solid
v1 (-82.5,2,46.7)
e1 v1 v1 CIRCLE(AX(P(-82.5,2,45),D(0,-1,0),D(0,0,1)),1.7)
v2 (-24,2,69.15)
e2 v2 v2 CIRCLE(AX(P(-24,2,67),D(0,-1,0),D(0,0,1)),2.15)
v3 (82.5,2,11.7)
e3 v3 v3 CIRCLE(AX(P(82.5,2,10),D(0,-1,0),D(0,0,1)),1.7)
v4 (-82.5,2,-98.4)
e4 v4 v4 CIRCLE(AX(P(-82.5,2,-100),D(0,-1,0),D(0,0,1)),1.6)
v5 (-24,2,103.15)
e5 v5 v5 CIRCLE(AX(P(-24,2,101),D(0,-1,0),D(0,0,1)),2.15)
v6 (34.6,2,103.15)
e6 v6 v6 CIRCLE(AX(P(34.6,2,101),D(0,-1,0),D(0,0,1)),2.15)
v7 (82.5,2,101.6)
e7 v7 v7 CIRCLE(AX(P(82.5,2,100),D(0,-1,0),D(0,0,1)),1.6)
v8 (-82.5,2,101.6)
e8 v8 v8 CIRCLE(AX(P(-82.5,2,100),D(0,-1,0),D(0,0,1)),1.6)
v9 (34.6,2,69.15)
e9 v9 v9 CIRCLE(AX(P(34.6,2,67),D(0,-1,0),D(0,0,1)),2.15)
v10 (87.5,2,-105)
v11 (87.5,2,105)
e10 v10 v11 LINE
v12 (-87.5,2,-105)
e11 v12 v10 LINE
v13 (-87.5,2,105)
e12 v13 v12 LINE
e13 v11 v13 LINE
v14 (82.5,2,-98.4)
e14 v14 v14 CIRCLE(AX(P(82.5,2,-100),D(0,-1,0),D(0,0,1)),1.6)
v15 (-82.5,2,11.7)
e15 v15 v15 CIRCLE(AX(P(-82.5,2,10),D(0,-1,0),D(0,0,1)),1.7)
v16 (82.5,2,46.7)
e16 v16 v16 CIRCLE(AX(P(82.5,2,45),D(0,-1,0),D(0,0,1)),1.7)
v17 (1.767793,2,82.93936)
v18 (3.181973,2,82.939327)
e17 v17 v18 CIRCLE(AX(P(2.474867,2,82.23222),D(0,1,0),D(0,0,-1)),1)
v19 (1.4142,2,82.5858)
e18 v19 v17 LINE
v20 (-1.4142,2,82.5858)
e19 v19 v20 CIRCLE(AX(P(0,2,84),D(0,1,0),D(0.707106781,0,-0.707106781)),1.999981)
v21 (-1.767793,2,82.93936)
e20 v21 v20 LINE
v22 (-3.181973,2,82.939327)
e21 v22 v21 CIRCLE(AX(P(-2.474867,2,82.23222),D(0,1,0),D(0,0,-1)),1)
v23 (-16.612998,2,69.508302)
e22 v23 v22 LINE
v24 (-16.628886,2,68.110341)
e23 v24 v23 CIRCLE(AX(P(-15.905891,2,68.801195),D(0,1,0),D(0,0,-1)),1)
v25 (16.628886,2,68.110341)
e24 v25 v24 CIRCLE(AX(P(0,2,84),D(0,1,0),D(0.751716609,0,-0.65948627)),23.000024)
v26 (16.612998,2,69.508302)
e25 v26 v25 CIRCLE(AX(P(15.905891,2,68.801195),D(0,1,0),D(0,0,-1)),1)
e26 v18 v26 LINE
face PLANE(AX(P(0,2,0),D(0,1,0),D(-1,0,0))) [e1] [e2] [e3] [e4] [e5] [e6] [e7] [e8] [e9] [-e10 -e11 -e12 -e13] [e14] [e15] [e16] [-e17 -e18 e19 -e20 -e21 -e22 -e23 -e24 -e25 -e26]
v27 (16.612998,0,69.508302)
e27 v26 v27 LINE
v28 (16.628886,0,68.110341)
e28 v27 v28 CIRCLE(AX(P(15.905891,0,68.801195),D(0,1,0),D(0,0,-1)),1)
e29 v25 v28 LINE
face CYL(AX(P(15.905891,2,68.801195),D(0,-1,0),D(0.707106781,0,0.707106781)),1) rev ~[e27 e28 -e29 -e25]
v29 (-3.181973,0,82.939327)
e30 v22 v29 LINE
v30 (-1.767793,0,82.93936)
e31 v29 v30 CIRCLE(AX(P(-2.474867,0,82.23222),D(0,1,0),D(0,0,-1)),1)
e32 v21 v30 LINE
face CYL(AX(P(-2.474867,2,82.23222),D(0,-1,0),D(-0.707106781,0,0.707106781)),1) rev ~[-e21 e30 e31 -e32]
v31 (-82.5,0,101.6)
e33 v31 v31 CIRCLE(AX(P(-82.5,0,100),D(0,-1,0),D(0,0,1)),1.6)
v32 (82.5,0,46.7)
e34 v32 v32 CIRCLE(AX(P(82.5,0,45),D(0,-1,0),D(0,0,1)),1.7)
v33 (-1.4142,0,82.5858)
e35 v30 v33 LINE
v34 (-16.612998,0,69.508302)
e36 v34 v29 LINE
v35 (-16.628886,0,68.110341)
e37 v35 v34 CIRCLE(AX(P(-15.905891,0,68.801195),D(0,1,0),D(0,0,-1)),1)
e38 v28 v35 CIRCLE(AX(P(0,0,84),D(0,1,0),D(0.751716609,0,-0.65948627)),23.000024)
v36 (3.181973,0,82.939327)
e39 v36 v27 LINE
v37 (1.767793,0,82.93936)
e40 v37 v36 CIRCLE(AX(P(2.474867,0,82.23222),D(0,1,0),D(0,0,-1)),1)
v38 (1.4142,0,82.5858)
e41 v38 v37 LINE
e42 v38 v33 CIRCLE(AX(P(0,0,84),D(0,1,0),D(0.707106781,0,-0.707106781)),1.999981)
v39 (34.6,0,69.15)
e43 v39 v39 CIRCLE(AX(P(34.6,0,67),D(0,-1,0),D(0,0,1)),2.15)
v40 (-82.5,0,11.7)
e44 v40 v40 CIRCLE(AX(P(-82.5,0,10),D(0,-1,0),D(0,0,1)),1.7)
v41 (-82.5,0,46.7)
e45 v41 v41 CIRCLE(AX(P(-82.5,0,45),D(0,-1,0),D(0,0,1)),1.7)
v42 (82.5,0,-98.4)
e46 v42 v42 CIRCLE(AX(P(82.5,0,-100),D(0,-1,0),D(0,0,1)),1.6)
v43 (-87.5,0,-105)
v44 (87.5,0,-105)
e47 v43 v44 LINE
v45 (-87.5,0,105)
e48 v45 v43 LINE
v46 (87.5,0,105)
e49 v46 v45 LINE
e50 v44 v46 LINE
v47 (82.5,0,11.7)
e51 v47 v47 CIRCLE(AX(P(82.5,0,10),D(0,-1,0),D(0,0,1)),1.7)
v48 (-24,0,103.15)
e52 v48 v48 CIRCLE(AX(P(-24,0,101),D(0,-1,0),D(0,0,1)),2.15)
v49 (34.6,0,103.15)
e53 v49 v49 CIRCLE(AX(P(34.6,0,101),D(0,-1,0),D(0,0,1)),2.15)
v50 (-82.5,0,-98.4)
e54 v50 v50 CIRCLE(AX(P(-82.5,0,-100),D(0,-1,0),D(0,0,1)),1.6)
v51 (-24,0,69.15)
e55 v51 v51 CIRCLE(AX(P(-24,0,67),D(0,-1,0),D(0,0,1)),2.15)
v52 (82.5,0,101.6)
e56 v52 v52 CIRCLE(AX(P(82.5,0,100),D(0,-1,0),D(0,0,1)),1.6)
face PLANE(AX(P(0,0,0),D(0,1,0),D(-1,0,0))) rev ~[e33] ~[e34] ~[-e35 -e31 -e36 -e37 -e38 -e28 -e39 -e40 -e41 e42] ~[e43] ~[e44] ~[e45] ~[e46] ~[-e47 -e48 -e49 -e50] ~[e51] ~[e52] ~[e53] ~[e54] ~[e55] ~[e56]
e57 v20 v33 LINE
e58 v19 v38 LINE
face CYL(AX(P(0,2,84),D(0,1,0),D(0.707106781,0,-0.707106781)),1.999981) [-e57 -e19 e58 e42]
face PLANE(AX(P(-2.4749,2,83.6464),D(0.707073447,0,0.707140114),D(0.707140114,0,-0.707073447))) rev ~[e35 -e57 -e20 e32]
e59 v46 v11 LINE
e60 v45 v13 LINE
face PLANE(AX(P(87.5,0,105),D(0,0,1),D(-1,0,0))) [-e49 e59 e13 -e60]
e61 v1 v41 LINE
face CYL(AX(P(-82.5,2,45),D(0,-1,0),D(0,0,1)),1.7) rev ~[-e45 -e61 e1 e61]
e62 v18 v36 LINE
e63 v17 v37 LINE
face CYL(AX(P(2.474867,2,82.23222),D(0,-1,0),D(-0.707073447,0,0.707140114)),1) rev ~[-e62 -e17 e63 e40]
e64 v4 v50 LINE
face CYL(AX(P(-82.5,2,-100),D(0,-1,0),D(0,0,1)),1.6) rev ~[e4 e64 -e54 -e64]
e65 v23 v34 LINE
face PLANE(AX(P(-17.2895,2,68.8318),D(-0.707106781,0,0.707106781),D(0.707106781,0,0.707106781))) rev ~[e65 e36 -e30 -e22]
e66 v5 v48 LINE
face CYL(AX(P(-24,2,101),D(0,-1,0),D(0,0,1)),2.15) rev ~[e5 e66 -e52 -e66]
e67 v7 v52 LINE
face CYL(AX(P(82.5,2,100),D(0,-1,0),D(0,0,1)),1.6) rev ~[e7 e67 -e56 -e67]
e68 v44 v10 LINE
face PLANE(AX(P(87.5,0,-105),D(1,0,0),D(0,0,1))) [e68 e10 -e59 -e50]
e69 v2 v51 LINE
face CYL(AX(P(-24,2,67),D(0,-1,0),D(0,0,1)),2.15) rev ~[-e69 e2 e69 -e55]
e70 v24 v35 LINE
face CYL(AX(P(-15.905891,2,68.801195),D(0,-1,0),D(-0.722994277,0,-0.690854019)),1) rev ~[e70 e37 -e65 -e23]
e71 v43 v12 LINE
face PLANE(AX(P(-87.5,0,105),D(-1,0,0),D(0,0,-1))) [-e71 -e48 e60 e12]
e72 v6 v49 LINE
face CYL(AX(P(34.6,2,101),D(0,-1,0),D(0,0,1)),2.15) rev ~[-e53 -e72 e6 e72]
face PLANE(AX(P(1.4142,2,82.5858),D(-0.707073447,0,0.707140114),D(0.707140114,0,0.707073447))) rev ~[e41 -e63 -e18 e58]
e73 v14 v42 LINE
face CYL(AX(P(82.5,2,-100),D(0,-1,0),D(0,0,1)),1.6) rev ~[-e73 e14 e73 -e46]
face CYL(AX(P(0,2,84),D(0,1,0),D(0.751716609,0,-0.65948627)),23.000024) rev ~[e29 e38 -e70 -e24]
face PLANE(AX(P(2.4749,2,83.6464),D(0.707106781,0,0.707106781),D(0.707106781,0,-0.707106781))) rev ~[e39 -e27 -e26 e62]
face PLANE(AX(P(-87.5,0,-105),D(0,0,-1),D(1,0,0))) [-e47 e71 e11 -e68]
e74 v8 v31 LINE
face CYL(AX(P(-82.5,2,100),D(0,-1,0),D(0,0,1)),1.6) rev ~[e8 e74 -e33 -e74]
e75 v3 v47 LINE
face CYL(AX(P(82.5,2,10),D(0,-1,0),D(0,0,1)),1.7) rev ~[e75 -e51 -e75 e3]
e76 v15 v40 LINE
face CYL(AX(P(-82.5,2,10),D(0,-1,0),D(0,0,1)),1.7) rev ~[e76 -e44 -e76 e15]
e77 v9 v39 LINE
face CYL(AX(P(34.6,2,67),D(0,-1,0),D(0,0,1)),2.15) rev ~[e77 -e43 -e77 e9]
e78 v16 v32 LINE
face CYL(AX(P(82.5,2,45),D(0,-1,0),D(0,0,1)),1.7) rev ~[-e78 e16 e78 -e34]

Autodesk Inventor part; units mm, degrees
ref_plane "YZ Plane" through (0, 0, 0) normal (1, 0, 0) x (0, 1, 0)
ref_plane "XZ Plane" through (0, 0, 0) normal (0, 1, 0) x (-1, 0, 0)
ref_plane "XY Plane" through (0, 0, 0) normal (0, 0, 1) x (1, 0, 0)
sketch "スケッチ1" plane through (0, 0, 0) normal (0, 1, 0) x (-1, 0, 0)
  line L0 (-87.5, 105) -> (87.5, 105)
  line L1 (87.5, 105) -> (87.5, -105)
  line L2 (87.5, -105) -> (-87.5, -105)
  line L3 (-87.5, -105) -> (-87.5, 105)
  line L4 (-87.5, 105) -> (87.5, -105) construction
  line L5 (87.5, 105) -> (-87.5, -105) construction
  point P0 (0, 0)
  dimension "d0" = 210
  dimension "d1" = 175
extrude "プレート1" add sketch "スケッチ1" along normal blind 2
sketch "スケッチ5" plane through (0, 2, 0) normal (0, 1, 0) x (1, 0, 0)
  line L0 (-24, -101) -> (34.6, -101)
  line L1 (34.6, -101) -> (34.6, -67)
  line L2 (34.6, -67) -> (-24, -67)
  line L3 (-24, -67) -> (-24, -101)
  line L4 (-24, -101) -> (34.6, -67) construction
  line L5 (34.6, -101) -> (-24, -67) construction
  line L6 (87.5, -105) -> (-87.5, -105) projected
  point P0 (0, 0)
  point P1 (0, -84)
  point P2 (5.3, -84)
  point P3 (5.3, -84)
  dimension "d31" = 58.6
  dimension "d32" = 24
  dimension "d33" = 34
  dimension "d78" = 4
hole "穴3" at (34.6, 2, 67) at (34.6, 2, 101) at (-24, 2, 67) at (-24, 2, 101) direction (0, -1, 0) diameter 4.3 end through all clearance for "Socket Head Cap Screw" size "M4" standard "Ansi Metric M Profile"
sketch "スケッチ6" plane through (0, 2, 0) normal (0, 1, 0) x (1, 0, 0)
  line L0 (-133.9967, -217.2896) -> (133.2896, 49.9967)
  line L1 (133.2896, 49.9967) -> (133.9967, 49.2896)
  line L2 (133.9967, 49.2896) -> (-133.2896, -217.9967)
  line L3 (-133.2896, -217.9967) -> (-133.9967, -217.2896)
  line L4 (-133.9967, -217.2896) -> (133.9967, 49.2896) construction
  line L5 (133.2896, 49.9967) -> (-133.2896, -217.9967) construction
  line L6 (133.9967, -217.2896) -> (-133.2896, 49.9967)
  line L7 (-133.2896, 49.9967) -> (-133.9967, 49.2896)
  line L8 (-133.9967, 49.2896) -> (133.2896, -217.9967)
  line L9 (133.2896, -217.9967) -> (133.9967, -217.2896)
  line L10 (133.9967, -217.2896) -> (-133.9967, 49.2896) construction
  line L11 (-133.2896, 49.9967) -> (133.2896, -217.9967) construction
  line L12 (-2.4749, -82.2322) -> (-1.7678, -81.5251)
  circle A0 centre (0, -84) radius 22
  line L13 (2.4749, -82.2322) -> (1.7678, -81.5251)
  circle A1 centre (0, -84) radius 3
  line L14 (-87.5, -105) -> (-87.5, 105) projected
  line L15 (87.5, 105) -> (87.5, -105) projected
  line L16 (122.5, 0) -> (-122.5, 0) projected
  point P0 (0, 0)
  point P1 (0, -84)
  point P2 (-2.1213, -81.8787)
  point P3 (2.1213, -81.8787)
  point P4 (15.9059, -68.8012)
  point P5 (-15.9059, -68.8012)
  dimension "d54" = 1
  dimension "d55" = 1
  dimension "d57" = 44
  dimension "d59" = 3
  dimension "d60" = 3
  dimension "d65" = 186
  dimension "d66" = 186
  dimension "d79" = 45
  dimension "d80" = 45
extrude "押し出し2" cut sketch "スケッチ6" against normal blind 10 contours A0 L6 L12 L8 | A0 L0 A1 L6 | L12 L6 A1 | A0 L2 L13 L0 | L0 L13 A1
sketch "スケッチ7" plane through (0, 2, 0) normal (0, 1, 0) x (1, 0, 0)
  line L0 (-82.5, -100) -> (82.5, -100)
  line L1 (82.5, -100) -> (82.5, 100)
  line L2 (82.5, 100) -> (-82.5, 100)
  line L3 (-82.5, 100) -> (-82.5, -100)
  line L4 (-82.5, -100) -> (82.5, 100) construction
  line L5 (82.5, -100) -> (-82.5, 100) construction
  line L6 (-87.5, -105) -> (-87.5, 105) projected
  line L7 (87.5, -105) -> (-87.5, -105) projected
  point P0 (0, 0)
  point P1 (-82.5, -45)
  point P2 (-82.5, -10)
  point P3 (82.5, -45)
  point P4 (82.5, -10)
  dimension "d45" = 5
  dimension "d46" = 5
  dimension "d67" = 55
  dimension "d68" = 35
  dimension "d69" = 55
  dimension "d70" = 35
hole "穴4" at (-82.5, 2, -100) at (82.5, 2, -100) at (-82.5, 2, 100) at (82.5, 2, 100) direction (0, -1, 0) diameter 3.2 end through all clearance for "Socket Head Cap Screw" size "M3" standard "Ansi Metric M Profile"
sketch "スケッチ8" plane through (0, 2, 0) normal (0, 1, 0) x (1, 0, 0)
  line L0 (15.9059, -68.8012) -> (2.4749, -82.2322) projected
  line L1 (-2.1213, -81.8787) -> (-2.4749, -82.2322) projected
  arc A0 (2.1213, -81.8787) -> (-2.1213, -81.8787) centre (0, -84) ccw projected
  line L2 (2.4749, -82.2322) -> (2.1213, -81.8787) projected
  line L3 (-2.4749, -82.2322) -> (-15.9059, -68.8012) projected
  arc A1 (15.9059, -68.8012) -> (-15.9059, -68.8012) centre (0, -84) ccw projected
  line L4 (2.4749, -83.6464) -> (17.2895, -68.8318)
  arc A2 (17.2895, -68.8318) -> (-17.2895, -68.8318) centre (0, -84) ccw
  line L5 (-17.2895, -68.8318) -> (-2.4749, -83.6464)
  line L6 (-2.4749, -83.6464) -> (-1.4142, -82.5858)
  arc A3 (1.4142, -82.5858) -> (-1.4142, -82.5858) centre (0, -84) ccw
  line L7 (1.4142, -82.5858) -> (2.4749, -83.6464)
  point P0 (0, 0)
  dimension "d61" = 1
extrude "押し出し3" cut sketch "スケッチ8" against normal blind 10 contours L0 L2 A0 L1 L3 A1 | L7 A3 L6 L5 A2 L4
fillet "コーナーR1" radius 1 4 edges at (-2.4749, 1, 83.6464) (2.4749, 1, 83.6464) (-17.2895, 1, 68.8318) (17.2895, 1, 68.8318)
hole "穴5" at (-82.5, 2, 45) at (-82.5, 2, 10) at (82.5, 2, 45) at (82.5, 2, 10) direction (0, -1, 0) diameter 3.4 end through all clearance for "Flat Head Machine Screw" size "M3" standard "Ansi Metric M Profile"
equation "\"d40\" = Thickness"
equation "\"d60\" = d59"
equation "\"d66\" = d65"
equation "\"d69\" = d67"
equation "\"d70\" = d68"
equation "\"d76\" = Thickness"
equation "\"d2\" = Thickness"
equation "\"BendRadius\" = Thickness"
equation "\"BendReliefWidth\" = Thickness"
equation "\"BendReliefDepth\" = 0.5 * Thickness"
equation "\"CornerReliefSize\" = 4 * Thickness"
equation "\"MinimumRemnant\" = 2 * Thickness"
equation "\"TransitionRadius\" = BendRadius"
equation "\"JacobiRadiusSize\" = BendRadius"
equation "\"GapSize\" = Thickness"
equation "\"Thickness\" = 2"
properties part number "s_carbon_plate1" material "CFRP"
